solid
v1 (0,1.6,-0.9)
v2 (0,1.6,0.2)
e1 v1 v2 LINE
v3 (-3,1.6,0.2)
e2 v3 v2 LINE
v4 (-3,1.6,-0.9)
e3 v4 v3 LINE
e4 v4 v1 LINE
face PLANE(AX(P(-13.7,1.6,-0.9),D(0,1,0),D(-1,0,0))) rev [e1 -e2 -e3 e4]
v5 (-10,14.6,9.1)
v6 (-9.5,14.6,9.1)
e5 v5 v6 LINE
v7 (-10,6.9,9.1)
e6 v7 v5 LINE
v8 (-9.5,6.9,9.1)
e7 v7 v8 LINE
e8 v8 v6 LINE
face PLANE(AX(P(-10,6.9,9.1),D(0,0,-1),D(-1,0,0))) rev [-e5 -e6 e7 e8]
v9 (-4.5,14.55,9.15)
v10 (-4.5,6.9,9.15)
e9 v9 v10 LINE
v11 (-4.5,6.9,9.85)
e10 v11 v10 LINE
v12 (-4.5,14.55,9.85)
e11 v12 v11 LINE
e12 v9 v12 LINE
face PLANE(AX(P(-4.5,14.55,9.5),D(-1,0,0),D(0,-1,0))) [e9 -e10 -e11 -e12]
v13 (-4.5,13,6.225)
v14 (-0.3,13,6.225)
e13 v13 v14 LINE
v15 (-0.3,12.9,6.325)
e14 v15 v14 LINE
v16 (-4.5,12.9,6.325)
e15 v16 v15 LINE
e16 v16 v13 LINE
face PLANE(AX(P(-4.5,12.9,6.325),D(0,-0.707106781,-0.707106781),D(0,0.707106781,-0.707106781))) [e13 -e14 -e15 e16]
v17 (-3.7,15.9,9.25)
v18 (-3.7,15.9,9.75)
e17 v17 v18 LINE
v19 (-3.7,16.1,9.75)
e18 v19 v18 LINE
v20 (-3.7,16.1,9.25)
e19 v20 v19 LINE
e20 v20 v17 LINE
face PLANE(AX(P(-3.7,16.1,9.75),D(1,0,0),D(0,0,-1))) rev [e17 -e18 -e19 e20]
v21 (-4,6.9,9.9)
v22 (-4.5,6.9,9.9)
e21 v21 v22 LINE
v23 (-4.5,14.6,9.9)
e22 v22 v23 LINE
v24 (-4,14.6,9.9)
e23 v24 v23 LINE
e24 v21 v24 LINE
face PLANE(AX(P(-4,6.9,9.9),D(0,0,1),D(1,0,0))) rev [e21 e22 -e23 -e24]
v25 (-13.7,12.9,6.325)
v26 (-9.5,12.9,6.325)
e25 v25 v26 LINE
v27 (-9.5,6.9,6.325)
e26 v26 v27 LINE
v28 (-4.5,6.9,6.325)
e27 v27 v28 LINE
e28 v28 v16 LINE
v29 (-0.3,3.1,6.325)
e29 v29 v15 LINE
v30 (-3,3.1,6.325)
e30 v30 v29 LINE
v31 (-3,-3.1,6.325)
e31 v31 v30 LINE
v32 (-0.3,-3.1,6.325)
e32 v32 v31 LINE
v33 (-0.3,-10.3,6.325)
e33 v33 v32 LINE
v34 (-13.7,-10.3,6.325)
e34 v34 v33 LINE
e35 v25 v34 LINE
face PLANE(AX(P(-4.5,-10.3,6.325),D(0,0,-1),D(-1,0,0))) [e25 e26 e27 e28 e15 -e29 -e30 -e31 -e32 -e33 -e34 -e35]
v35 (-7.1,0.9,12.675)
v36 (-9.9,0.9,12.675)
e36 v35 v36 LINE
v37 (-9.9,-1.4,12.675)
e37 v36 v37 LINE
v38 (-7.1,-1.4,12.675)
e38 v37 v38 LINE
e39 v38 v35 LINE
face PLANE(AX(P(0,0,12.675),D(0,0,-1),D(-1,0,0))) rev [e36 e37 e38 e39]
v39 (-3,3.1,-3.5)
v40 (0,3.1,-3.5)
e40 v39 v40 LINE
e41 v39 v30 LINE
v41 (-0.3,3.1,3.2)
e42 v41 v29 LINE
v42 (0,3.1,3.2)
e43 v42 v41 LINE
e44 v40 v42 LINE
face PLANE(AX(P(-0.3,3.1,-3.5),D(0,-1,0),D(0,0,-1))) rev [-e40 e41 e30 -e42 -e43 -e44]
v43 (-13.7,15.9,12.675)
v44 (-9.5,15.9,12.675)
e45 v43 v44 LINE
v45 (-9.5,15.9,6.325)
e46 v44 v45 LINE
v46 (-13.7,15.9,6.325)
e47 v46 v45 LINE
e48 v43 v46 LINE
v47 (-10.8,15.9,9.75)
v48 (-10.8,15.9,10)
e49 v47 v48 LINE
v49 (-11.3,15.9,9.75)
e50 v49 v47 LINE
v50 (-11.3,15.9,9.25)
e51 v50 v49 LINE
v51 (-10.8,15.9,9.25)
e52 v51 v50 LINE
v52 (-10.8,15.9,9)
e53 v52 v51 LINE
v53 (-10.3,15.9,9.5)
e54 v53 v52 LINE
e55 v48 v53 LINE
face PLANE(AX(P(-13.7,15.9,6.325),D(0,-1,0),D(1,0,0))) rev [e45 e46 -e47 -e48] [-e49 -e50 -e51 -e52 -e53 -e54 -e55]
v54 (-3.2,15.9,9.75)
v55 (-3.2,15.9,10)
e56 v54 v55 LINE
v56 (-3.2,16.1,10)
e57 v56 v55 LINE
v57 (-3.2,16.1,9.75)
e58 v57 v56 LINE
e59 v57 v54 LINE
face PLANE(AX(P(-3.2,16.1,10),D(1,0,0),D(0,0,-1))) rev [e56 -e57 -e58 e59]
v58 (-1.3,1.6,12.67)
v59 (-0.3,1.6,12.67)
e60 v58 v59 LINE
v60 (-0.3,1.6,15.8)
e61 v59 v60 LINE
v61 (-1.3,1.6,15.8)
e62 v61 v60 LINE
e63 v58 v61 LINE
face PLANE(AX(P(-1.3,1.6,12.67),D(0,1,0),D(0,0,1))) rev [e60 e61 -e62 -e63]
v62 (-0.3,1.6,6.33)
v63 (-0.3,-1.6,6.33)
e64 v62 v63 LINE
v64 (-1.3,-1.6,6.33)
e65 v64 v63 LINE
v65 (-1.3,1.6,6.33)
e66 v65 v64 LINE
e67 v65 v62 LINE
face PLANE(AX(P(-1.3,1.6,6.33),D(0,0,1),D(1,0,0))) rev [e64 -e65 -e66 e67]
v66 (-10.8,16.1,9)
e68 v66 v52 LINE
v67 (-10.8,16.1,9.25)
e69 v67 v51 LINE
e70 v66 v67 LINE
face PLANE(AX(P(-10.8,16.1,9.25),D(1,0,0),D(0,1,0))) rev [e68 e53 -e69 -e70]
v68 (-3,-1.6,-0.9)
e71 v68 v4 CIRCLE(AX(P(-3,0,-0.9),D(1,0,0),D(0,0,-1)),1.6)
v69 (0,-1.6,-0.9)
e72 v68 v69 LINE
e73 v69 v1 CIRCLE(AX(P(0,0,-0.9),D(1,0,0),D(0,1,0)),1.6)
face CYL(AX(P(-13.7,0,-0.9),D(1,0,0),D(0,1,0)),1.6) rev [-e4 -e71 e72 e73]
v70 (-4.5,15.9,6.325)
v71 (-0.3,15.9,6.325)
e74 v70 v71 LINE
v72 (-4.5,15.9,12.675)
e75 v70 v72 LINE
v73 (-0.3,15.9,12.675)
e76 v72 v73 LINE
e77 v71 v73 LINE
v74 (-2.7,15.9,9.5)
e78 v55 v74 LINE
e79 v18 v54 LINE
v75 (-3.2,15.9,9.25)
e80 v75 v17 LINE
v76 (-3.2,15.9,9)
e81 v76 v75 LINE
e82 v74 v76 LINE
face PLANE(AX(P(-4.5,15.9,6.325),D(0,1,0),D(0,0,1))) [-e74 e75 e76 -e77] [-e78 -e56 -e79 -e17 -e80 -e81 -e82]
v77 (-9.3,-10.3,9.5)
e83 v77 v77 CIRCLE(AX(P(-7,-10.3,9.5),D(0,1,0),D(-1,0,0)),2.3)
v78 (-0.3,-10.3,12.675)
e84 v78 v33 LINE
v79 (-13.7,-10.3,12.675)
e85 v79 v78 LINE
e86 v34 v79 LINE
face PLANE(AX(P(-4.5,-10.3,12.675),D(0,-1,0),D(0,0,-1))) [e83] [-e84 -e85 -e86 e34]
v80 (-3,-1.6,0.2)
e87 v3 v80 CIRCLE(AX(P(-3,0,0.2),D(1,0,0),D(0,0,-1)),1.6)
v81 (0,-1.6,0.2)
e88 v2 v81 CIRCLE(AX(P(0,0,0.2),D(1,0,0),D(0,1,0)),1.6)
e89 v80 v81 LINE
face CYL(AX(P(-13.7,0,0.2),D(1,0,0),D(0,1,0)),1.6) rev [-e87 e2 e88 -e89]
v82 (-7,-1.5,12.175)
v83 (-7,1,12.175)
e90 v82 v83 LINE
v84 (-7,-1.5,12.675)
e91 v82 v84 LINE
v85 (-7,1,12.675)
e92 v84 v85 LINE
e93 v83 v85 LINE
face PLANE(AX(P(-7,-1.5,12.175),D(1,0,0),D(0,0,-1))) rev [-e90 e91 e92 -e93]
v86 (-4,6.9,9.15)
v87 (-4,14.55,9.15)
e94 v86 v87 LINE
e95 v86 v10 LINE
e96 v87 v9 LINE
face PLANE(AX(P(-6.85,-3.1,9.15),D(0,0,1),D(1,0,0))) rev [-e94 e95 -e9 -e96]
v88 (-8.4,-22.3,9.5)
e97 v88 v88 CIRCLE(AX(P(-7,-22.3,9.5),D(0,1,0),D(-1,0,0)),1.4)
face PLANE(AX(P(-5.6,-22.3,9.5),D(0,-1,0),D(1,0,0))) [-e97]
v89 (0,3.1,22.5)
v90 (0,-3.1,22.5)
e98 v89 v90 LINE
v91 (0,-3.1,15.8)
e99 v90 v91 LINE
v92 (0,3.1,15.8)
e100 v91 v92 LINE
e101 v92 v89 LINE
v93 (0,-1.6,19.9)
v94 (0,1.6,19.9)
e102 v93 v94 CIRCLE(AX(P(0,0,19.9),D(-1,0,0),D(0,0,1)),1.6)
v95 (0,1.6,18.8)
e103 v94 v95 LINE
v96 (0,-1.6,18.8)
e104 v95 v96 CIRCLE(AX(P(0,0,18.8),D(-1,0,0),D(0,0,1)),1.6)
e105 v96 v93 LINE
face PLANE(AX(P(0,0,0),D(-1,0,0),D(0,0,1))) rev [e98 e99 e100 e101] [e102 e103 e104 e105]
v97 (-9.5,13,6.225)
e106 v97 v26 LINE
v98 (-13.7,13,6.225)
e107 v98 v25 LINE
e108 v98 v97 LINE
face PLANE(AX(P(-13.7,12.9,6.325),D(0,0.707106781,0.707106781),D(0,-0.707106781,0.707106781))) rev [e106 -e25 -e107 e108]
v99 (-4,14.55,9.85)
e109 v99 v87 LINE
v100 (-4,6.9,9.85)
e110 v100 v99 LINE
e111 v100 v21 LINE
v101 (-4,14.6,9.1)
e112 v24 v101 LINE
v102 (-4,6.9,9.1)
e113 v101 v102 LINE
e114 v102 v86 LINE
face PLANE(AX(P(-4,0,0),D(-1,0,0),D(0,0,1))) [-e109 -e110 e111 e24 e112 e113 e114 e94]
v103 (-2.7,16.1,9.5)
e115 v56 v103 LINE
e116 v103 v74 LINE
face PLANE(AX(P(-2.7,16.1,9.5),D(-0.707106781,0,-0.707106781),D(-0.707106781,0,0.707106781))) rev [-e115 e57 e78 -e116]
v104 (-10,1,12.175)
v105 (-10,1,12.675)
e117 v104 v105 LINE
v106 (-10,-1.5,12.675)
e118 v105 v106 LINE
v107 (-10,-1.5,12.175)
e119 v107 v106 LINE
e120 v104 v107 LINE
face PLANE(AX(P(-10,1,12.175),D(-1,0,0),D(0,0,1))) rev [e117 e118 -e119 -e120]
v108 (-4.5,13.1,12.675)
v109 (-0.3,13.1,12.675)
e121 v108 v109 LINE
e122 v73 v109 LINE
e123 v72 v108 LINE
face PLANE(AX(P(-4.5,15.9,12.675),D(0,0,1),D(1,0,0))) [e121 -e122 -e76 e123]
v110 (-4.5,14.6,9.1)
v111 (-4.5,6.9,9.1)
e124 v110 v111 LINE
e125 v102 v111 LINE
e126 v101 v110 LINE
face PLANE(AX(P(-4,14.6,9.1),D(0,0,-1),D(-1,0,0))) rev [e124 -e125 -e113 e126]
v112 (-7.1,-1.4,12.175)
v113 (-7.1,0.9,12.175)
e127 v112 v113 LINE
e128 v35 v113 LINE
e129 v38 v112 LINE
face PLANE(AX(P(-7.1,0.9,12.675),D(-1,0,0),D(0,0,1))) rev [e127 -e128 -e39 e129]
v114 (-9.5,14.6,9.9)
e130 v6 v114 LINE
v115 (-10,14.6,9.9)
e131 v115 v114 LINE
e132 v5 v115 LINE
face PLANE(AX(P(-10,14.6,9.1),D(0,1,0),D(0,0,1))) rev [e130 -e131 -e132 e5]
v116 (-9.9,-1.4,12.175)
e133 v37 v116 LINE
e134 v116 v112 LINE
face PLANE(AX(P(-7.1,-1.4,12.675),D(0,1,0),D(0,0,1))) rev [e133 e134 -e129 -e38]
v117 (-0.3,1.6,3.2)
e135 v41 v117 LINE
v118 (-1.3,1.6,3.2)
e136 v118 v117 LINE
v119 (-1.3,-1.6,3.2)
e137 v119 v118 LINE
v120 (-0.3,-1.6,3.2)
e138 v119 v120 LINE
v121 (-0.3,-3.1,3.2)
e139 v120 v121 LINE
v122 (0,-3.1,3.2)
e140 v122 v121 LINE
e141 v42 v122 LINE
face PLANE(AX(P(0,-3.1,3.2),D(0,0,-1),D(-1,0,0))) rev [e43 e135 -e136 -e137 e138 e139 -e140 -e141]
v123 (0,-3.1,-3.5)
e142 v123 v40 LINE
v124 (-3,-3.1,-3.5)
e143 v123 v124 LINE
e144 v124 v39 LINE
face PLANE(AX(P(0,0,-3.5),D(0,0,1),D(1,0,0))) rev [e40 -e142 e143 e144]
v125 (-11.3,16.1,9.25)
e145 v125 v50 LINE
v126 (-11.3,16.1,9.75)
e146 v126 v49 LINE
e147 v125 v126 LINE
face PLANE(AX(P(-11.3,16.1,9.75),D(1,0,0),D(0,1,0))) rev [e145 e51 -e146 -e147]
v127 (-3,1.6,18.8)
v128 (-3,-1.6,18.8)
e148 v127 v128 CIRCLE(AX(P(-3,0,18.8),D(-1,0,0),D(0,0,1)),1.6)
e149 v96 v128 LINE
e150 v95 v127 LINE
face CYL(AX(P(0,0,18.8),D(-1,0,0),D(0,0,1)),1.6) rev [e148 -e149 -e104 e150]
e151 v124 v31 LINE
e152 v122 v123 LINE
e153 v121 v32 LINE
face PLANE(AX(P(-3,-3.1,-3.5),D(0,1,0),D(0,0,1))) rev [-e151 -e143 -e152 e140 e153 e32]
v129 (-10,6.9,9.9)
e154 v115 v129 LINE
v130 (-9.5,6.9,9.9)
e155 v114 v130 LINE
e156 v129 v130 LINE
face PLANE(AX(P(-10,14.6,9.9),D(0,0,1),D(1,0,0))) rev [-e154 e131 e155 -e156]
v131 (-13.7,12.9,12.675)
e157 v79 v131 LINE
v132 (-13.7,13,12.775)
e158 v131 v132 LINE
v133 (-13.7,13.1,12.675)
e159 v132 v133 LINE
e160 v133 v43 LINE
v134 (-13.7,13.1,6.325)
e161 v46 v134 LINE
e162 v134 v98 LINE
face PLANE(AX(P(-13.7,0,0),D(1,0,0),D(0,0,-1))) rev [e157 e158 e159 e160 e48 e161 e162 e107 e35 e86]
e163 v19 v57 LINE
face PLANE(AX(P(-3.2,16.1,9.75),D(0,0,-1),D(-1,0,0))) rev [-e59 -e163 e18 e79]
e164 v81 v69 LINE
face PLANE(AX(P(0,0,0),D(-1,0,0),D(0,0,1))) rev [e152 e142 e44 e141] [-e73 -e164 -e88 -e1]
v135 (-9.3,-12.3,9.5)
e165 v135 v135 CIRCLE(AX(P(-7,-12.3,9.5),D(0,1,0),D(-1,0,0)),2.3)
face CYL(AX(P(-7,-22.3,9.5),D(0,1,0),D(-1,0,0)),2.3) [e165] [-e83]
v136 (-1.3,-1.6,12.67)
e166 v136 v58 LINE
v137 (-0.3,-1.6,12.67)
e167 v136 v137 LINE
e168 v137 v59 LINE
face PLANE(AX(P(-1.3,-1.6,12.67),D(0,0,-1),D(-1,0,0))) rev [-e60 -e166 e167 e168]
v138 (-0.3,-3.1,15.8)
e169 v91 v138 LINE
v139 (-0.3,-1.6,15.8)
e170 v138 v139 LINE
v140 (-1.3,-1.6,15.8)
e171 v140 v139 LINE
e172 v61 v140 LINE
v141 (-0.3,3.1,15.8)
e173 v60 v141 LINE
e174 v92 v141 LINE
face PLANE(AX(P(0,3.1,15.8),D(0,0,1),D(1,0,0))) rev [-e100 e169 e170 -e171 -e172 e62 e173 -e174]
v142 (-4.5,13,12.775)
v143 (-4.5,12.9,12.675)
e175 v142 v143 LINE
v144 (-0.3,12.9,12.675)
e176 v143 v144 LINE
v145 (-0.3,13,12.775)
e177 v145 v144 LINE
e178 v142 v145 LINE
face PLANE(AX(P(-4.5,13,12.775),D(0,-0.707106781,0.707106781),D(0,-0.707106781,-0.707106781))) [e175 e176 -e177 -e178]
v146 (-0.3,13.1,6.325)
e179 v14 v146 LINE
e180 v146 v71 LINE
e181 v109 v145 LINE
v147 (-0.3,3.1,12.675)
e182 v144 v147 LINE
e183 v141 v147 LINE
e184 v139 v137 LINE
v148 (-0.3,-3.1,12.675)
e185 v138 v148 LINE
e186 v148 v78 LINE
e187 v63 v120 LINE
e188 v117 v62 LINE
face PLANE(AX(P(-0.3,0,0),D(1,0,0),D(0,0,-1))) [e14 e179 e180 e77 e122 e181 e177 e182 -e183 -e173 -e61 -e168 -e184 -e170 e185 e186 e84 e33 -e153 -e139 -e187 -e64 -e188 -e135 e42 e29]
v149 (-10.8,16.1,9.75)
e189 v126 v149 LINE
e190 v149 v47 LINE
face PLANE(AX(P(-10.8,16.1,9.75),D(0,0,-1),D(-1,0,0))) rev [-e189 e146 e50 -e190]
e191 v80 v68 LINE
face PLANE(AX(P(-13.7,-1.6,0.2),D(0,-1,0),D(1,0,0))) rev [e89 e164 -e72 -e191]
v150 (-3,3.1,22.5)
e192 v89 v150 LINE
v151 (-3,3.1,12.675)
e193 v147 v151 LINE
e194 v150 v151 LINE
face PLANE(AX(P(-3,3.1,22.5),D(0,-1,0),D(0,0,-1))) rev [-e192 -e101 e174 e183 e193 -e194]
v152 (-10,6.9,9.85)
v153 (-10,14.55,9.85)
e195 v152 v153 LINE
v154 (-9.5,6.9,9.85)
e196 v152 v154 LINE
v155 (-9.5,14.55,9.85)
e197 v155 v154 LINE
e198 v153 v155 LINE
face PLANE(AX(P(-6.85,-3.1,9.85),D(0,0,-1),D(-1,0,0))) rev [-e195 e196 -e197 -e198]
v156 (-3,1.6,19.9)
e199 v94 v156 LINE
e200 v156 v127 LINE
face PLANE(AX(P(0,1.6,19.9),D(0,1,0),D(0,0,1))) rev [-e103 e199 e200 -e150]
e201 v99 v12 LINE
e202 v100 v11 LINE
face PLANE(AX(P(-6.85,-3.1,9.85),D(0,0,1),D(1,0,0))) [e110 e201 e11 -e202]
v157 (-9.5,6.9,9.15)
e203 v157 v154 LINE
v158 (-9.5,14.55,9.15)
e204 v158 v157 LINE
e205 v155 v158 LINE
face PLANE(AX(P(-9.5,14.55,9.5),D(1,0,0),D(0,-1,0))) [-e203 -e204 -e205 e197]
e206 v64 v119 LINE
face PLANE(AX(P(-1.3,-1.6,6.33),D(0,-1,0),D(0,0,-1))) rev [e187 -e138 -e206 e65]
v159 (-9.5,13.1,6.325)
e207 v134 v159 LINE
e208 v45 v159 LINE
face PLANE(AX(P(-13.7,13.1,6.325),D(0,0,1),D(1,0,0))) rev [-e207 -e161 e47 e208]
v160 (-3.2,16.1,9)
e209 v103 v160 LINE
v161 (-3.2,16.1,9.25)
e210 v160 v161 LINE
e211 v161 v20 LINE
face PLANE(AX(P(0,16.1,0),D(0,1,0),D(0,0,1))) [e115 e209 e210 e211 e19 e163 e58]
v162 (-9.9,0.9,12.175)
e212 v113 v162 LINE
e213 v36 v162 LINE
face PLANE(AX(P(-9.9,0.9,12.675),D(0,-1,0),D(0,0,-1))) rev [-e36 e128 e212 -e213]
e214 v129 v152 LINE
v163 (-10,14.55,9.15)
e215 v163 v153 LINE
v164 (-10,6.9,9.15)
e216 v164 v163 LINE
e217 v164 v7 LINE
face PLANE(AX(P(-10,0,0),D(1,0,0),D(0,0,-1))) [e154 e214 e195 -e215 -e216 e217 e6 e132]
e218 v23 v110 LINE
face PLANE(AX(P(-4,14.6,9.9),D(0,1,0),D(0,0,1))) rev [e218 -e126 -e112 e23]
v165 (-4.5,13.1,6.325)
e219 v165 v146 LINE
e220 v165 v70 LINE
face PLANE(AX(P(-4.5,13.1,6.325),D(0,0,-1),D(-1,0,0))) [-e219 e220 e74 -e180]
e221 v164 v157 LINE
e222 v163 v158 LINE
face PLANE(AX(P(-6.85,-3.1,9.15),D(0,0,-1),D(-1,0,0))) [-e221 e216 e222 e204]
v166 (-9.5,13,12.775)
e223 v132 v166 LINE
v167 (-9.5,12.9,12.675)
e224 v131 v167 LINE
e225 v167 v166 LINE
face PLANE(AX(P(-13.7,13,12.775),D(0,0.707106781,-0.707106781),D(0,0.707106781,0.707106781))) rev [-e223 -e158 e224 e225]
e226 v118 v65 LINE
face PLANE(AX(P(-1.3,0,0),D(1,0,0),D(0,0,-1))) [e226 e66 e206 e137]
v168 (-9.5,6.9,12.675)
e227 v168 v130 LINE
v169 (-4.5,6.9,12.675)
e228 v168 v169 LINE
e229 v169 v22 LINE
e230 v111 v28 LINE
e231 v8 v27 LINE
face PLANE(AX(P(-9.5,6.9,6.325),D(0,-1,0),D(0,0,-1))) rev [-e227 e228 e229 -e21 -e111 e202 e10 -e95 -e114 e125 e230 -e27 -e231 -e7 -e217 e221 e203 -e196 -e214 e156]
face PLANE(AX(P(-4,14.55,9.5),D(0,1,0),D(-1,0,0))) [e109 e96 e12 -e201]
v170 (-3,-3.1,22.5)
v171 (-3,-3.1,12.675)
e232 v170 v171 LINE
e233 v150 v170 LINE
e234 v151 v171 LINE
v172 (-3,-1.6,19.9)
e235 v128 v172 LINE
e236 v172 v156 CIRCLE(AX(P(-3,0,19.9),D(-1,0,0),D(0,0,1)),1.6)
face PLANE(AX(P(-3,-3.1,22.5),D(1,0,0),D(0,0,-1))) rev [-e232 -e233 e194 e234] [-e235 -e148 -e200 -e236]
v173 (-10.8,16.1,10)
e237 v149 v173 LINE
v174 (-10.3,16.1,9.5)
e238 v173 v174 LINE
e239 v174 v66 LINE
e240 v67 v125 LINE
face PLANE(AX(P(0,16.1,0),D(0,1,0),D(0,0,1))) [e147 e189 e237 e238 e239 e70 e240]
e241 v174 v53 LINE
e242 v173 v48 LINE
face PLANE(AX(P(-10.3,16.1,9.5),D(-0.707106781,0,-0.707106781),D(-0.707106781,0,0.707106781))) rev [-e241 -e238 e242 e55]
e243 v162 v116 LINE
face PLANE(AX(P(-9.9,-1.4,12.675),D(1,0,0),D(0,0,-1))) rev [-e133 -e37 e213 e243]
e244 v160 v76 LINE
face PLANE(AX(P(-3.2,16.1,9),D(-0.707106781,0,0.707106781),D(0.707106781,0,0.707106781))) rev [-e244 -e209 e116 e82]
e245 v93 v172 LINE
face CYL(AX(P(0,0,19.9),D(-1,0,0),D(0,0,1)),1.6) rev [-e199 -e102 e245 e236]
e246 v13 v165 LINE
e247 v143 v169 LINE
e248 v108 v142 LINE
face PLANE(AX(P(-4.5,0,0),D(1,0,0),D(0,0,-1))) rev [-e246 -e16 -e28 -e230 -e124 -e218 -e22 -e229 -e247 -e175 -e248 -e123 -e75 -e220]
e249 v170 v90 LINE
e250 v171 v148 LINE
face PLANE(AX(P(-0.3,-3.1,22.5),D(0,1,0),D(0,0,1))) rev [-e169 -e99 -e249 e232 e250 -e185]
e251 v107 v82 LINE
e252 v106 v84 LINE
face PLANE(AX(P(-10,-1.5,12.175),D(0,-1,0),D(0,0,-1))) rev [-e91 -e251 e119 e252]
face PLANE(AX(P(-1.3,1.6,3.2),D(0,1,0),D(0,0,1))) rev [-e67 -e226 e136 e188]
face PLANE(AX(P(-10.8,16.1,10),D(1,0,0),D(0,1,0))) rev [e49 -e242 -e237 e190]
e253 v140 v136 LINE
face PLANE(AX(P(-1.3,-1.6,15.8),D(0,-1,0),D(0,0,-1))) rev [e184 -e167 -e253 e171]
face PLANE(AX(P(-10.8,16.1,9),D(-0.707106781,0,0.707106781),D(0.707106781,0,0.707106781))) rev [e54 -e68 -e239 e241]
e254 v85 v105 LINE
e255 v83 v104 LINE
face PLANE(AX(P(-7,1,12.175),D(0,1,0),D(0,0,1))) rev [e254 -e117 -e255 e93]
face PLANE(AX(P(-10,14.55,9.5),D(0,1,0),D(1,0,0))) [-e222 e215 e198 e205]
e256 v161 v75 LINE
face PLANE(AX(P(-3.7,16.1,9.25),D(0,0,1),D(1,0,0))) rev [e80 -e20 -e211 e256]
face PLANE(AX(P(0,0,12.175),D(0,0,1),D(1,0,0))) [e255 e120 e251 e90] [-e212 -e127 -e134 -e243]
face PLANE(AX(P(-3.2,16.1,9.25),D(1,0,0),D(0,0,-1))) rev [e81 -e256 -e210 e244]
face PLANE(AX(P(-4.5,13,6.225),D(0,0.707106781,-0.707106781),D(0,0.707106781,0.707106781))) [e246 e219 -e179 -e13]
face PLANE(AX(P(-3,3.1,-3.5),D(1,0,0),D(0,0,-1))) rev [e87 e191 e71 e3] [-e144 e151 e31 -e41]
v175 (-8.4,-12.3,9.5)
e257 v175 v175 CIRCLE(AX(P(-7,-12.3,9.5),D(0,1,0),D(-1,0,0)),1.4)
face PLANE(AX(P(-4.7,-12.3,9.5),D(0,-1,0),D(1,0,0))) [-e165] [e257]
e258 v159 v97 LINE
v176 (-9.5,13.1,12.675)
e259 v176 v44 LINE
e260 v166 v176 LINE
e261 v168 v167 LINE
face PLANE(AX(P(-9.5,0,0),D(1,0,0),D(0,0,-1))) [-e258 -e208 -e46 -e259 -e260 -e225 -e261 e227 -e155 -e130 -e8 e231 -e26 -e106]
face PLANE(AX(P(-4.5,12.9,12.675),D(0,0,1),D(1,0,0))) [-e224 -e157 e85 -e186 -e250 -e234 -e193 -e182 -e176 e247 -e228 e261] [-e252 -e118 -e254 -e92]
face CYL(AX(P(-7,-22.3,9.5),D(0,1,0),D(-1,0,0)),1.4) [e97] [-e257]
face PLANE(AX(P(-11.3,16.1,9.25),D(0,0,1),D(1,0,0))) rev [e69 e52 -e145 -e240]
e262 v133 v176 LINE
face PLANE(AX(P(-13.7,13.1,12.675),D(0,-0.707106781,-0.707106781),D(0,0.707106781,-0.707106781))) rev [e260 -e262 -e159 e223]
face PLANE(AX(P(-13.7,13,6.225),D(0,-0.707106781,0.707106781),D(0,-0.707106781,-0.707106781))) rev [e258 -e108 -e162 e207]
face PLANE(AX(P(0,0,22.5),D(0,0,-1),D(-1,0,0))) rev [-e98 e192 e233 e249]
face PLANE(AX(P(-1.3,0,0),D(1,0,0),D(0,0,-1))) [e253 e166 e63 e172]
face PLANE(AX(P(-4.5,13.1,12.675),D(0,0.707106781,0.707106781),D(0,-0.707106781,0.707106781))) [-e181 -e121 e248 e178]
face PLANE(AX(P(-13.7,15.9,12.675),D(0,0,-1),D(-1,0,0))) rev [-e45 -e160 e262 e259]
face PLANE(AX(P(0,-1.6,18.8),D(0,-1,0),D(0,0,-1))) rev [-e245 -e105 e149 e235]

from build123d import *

# Parameters (mm, degrees)
BOSS_EXTRUDE1_DEPTH  = 4.2
SKETCH2_W            = 6.35
SKETCH2_H            = 17.2
BOSS_EXTRUDE2_DEPTH  = 5
BOSS_EXTRUDE3_DEPTH  = 4.2
SKETCH4_W            = 0.8
SKETCH4_H            = 7.7
CUT_EXTRUDE1_DEPTH   = 0.5
SKETCH5_W            = 0.8
SKETCH5_H            = 7.7
CUT_EXTRUDE2_DEPTH   = 0.5
SKETCH6_W            = 2.7
SKETCH6_H            = 6.2
BOSS_EXTRUDE4_DEPTH  = 9.825
SKETCH7_W            = 6.7
SKETCH7_H            = 6.2
BOSS_EXTRUDE5_DEPTH  = 0.3
SKETCH8_W            = 3.13
SKETCH8_H            = 3.2
CUT_EXTRUDE3_DEPTH   = 1
SKETCH9_W            = 2.7
SKETCH9_H            = 6.2
BOSS_EXTRUDE6_DEPTH  = 9.825
SKETCH10_W           = 6.7
SKETCH10_H           = 6.2
BOSS_EXTRUDE7_DEPTH  = 0.3
SKETCH11_W           = 3.13
SKETCH11_H           = 3.2
CUT_EXTRUDE4_DEPTH   = 1
CUT_EXTRUDE5_DEPTH   = 30.55587928
CUT_EXTRUDE6_DEPTH   = 31.769302885
BOSS_EXTRUDE8_DEPTH  = 0.2
BOSS_EXTRUDE9_DEPTH  = 0.2
SKETCH16_W           = 3
SKETCH16_H           = 2.5
CUT_EXTRUDE7_DEPTH   = 0.5
SKETCH17_W           = 2.8
SKETCH17_H           = 2.3
BOSS_EXTRUDE10_DEPTH = 0.5
RIB1_START           = -0.35
RIB1_OUTLINE_W       = 0.5
RIB1_OUTLINE_H       = 7.65
RIB1_DEPTH           = 0.7
RIB2_START           = -0.35
RIB2_OUTLINE_W       = 0.5
RIB2_OUTLINE_H       = 7.65
RIB2_DEPTH           = 0.7


# Read off the part's stored shape, not the designer's step: Rib1, Rib2
with BuildPart() as part:
    # Sketch1 → Boss-Extrude1 (new body)
    with BuildSketch(Plane(origin=(-0.3, 0, 0), x_dir=(0, 0, -1), z_dir=(1, 0, 0))):
        Polygon((-12.775, 13), (-12.675, 12.9), (-12.675, -10.3), (-6.325, -10.3), (-6.325, 12.9), (-6.225, 13), (-6.325, 13.1), (-6.325, 15.9), (-12.675, 15.9), (-12.675, 13.1), align=None)
    extrude(amount=-BOSS_EXTRUDE1_DEPTH)

    # Sketch2 → Boss-Extrude2 (add)
    with BuildSketch(Plane.ZY.offset(4.5)):
        with Locations((9.5, -1.7)):
            Rectangle(SKETCH2_W, SKETCH2_H)
    extrude(amount=BOSS_EXTRUDE2_DEPTH)

    # Sketch3 → Boss-Extrude3 (add)
    with BuildSketch(Plane.ZY.offset(9.5)):
        Polygon((6.325, 13.1), (6.325, 15.9), (12.675, 15.9), (12.675, 13.1), (12.775, 13), (12.675, 12.9), (12.675, -10.3), (6.325, -10.3), (6.325, 12.9), (6.225, 13), align=None)
    extrude(amount=BOSS_EXTRUDE3_DEPTH)

    # Sketch4 → Cut-Extrude1 (cut)
    with BuildSketch(Plane(origin=(-9.5, 0, 0), x_dir=(0, 0, -1), z_dir=(1, 0, 0))):
        with Locations((-9.5, 10.75)):
            Rectangle(SKETCH4_W, SKETCH4_H)
    extrude(amount=-CUT_EXTRUDE1_DEPTH, mode=Mode.SUBTRACT)

    # Sketch5 → Cut-Extrude2 (cut)
    with BuildSketch(Plane.ZY.offset(4.5)):
        with Locations((9.5, 10.75)):
            Rectangle(SKETCH5_W, SKETCH5_H)
    extrude(amount=-CUT_EXTRUDE2_DEPTH, mode=Mode.SUBTRACT)

    # Sketch6 → Boss-Extrude4 (add)
    with BuildSketch(Plane.XY.offset(12.675)):
        with Locations((-1.65, 0)):
            Rectangle(SKETCH6_W, SKETCH6_H)
    extrude(amount=BOSS_EXTRUDE4_DEPTH)

    # Sketch7 → Boss-Extrude5 (add)
    with BuildSketch(Plane(origin=(-0.3, 0, 0), x_dir=(0, 0, -1), z_dir=(1, 0, 0))):
        with Locations((-19.15, 0)):
            Rectangle(SKETCH7_W, SKETCH7_H)
    extrude(amount=BOSS_EXTRUDE5_DEPTH)

    # Sketch8 → Cut-Extrude3 (cut)
    with BuildSketch(Plane(origin=(-0.3, 0, 0), x_dir=(0, 0, -1), z_dir=(1, 0, 0))):
        with Locations((-14.235, 0)):
            Rectangle(SKETCH8_W, SKETCH8_H)
    extrude(amount=-CUT_EXTRUDE3_DEPTH, mode=Mode.SUBTRACT)

    # Sketch9 → Boss-Extrude6 (add)
    with BuildSketch(Plane(origin=(0, 0, 6.325), x_dir=(-1, 0, 0), z_dir=(0, 0, -1))):
        with Locations((1.65, 0)):
            Rectangle(SKETCH9_W, SKETCH9_H)
    extrude(amount=BOSS_EXTRUDE6_DEPTH)

    # Sketch10 → Boss-Extrude7 (add)
    with BuildSketch(Plane(origin=(-0.3, 0, 0), x_dir=(0, 0, -1), z_dir=(1, 0, 0))):
        with Locations((0.15, 0)):
            Rectangle(SKETCH10_W, SKETCH10_H)
    extrude(amount=BOSS_EXTRUDE7_DEPTH)

    # Sketch11 → Cut-Extrude4 (cut)
    with BuildSketch(Plane(origin=(-0.3, 0, 0), x_dir=(0, 0, -1), z_dir=(1, 0, 0))):
        with Locations((-4.765, 0)):
            Rectangle(SKETCH11_W, SKETCH11_H)
    extrude(amount=-CUT_EXTRUDE4_DEPTH, mode=Mode.SUBTRACT)

    # Sketch12 → Cut-Extrude5 (cut, through all)
    with BuildSketch(Plane.ZY.offset(3)):
        with BuildLine():
            Line((18.8, -1.6), (19.9, -1.6))
            ThreePointArc((19.9, -1.6), (21.5, 0), (19.9, 1.6))
            Line((19.9, 1.6), (18.8, 1.6))
            ThreePointArc((18.8, 1.6), (17.2, 0), (18.8, -1.6))
        make_face()
    extrude(amount=-CUT_EXTRUDE5_DEPTH, mode=Mode.SUBTRACT)

    # Sketch13 → Cut-Extrude6 (cut, through all)
    with BuildSketch(Plane(origin=(0, 0, 0), x_dir=(0, 0, -1), z_dir=(1, 0, 0))):
        with BuildLine():
            Line((-0.2, -1.6), (0.9, -1.6))
            ThreePointArc((0.9, -1.6), (2.5, 0), (0.9, 1.6))
            Line((0.9, 1.6), (-0.2, 1.6))
            ThreePointArc((-0.2, 1.6), (-1.8, 0), (-0.2, -1.6))
        make_face()
    extrude(amount=-CUT_EXTRUDE6_DEPTH, mode=Mode.SUBTRACT)

    # Sketch14 → Boss-Extrude8 (add)
    with BuildSketch(Plane(origin=(0, 15.9, 0), x_dir=(-1, 0, 0), z_dir=(0, 1, 0))):
        Polygon((10.8, 10), (10.8, 9.75), (11.3, 9.75), (11.3, 9.25), (10.8, 9.25), (10.8, 9), (10.3, 9.5), align=None)
    extrude(amount=BOSS_EXTRUDE8_DEPTH)

    # Sketch15 → Boss-Extrude9 (add)
    with BuildSketch(Plane(origin=(0, 15.9, 0), x_dir=(-1, 0, 0), z_dir=(0, 1, 0))):
        Polygon((3.2, 10), (3.2, 9.75), (3.7, 9.75), (3.7, 9.25), (3.2, 9.25), (3.2, 9), (2.7, 9.5), align=None)
    extrude(amount=BOSS_EXTRUDE9_DEPTH)

    # Sketch16 → Cut-Extrude7 (cut)
    with BuildSketch(Plane.XY.offset(12.675)):
        with Locations((-8.5, -0.25)):
            Rectangle(SKETCH16_W, SKETCH16_H)
    extrude(amount=-CUT_EXTRUDE7_DEPTH, mode=Mode.SUBTRACT)

    # Sketch17 → Boss-Extrude10 (add)
    with BuildSketch(Plane.XY.offset(12.175)):
        with Locations((-8.5, -0.25)):
            Rectangle(SKETCH17_W, SKETCH17_H)
    extrude(amount=BOSS_EXTRUDE10_DEPTH)

    # Sketch18 → Revolve1 (revolve)
    with BuildSketch(Plane(origin=(0, 0, 9.5), x_dir=(-1, 0, 0), z_dir=(0, 0, -1)), mode=Mode.PRIVATE) as revolve1_sk:
        Polygon((5.6, -22.3), (7, -22.3), (7, -10.3), (4.7, -10.3), (4.7, -12.3), (5.6, -12.3), align=None)
    revolve(revolve1_sk.sketch.rotate(Axis((-7, -22.3, 9.5), (0, 1, 0)), 180), axis=Axis((-7, -22.3, 9.5), (0, 1, 0)))

    # Rib1 outline → Rib1 (add)
    with BuildSketch(Plane(origin=(0, 0, 9.5), x_dir=(-1, 0, 0), z_dir=(0, 0, -1)).offset(RIB1_START)):
        with Locations((9.75, 10.725)):
            Rectangle(RIB1_OUTLINE_W, RIB1_OUTLINE_H)
    extrude(amount=RIB1_DEPTH)

    # Rib2 outline → Rib2 (add)
    with BuildSketch(Plane.XY.offset(9.5).offset(RIB2_START)):
        with Locations((-4.25, 10.725)):
            Rectangle(RIB2_OUTLINE_W, RIB2_OUTLINE_H)
    extrude(amount=RIB2_DEPTH)


solid = part.part
